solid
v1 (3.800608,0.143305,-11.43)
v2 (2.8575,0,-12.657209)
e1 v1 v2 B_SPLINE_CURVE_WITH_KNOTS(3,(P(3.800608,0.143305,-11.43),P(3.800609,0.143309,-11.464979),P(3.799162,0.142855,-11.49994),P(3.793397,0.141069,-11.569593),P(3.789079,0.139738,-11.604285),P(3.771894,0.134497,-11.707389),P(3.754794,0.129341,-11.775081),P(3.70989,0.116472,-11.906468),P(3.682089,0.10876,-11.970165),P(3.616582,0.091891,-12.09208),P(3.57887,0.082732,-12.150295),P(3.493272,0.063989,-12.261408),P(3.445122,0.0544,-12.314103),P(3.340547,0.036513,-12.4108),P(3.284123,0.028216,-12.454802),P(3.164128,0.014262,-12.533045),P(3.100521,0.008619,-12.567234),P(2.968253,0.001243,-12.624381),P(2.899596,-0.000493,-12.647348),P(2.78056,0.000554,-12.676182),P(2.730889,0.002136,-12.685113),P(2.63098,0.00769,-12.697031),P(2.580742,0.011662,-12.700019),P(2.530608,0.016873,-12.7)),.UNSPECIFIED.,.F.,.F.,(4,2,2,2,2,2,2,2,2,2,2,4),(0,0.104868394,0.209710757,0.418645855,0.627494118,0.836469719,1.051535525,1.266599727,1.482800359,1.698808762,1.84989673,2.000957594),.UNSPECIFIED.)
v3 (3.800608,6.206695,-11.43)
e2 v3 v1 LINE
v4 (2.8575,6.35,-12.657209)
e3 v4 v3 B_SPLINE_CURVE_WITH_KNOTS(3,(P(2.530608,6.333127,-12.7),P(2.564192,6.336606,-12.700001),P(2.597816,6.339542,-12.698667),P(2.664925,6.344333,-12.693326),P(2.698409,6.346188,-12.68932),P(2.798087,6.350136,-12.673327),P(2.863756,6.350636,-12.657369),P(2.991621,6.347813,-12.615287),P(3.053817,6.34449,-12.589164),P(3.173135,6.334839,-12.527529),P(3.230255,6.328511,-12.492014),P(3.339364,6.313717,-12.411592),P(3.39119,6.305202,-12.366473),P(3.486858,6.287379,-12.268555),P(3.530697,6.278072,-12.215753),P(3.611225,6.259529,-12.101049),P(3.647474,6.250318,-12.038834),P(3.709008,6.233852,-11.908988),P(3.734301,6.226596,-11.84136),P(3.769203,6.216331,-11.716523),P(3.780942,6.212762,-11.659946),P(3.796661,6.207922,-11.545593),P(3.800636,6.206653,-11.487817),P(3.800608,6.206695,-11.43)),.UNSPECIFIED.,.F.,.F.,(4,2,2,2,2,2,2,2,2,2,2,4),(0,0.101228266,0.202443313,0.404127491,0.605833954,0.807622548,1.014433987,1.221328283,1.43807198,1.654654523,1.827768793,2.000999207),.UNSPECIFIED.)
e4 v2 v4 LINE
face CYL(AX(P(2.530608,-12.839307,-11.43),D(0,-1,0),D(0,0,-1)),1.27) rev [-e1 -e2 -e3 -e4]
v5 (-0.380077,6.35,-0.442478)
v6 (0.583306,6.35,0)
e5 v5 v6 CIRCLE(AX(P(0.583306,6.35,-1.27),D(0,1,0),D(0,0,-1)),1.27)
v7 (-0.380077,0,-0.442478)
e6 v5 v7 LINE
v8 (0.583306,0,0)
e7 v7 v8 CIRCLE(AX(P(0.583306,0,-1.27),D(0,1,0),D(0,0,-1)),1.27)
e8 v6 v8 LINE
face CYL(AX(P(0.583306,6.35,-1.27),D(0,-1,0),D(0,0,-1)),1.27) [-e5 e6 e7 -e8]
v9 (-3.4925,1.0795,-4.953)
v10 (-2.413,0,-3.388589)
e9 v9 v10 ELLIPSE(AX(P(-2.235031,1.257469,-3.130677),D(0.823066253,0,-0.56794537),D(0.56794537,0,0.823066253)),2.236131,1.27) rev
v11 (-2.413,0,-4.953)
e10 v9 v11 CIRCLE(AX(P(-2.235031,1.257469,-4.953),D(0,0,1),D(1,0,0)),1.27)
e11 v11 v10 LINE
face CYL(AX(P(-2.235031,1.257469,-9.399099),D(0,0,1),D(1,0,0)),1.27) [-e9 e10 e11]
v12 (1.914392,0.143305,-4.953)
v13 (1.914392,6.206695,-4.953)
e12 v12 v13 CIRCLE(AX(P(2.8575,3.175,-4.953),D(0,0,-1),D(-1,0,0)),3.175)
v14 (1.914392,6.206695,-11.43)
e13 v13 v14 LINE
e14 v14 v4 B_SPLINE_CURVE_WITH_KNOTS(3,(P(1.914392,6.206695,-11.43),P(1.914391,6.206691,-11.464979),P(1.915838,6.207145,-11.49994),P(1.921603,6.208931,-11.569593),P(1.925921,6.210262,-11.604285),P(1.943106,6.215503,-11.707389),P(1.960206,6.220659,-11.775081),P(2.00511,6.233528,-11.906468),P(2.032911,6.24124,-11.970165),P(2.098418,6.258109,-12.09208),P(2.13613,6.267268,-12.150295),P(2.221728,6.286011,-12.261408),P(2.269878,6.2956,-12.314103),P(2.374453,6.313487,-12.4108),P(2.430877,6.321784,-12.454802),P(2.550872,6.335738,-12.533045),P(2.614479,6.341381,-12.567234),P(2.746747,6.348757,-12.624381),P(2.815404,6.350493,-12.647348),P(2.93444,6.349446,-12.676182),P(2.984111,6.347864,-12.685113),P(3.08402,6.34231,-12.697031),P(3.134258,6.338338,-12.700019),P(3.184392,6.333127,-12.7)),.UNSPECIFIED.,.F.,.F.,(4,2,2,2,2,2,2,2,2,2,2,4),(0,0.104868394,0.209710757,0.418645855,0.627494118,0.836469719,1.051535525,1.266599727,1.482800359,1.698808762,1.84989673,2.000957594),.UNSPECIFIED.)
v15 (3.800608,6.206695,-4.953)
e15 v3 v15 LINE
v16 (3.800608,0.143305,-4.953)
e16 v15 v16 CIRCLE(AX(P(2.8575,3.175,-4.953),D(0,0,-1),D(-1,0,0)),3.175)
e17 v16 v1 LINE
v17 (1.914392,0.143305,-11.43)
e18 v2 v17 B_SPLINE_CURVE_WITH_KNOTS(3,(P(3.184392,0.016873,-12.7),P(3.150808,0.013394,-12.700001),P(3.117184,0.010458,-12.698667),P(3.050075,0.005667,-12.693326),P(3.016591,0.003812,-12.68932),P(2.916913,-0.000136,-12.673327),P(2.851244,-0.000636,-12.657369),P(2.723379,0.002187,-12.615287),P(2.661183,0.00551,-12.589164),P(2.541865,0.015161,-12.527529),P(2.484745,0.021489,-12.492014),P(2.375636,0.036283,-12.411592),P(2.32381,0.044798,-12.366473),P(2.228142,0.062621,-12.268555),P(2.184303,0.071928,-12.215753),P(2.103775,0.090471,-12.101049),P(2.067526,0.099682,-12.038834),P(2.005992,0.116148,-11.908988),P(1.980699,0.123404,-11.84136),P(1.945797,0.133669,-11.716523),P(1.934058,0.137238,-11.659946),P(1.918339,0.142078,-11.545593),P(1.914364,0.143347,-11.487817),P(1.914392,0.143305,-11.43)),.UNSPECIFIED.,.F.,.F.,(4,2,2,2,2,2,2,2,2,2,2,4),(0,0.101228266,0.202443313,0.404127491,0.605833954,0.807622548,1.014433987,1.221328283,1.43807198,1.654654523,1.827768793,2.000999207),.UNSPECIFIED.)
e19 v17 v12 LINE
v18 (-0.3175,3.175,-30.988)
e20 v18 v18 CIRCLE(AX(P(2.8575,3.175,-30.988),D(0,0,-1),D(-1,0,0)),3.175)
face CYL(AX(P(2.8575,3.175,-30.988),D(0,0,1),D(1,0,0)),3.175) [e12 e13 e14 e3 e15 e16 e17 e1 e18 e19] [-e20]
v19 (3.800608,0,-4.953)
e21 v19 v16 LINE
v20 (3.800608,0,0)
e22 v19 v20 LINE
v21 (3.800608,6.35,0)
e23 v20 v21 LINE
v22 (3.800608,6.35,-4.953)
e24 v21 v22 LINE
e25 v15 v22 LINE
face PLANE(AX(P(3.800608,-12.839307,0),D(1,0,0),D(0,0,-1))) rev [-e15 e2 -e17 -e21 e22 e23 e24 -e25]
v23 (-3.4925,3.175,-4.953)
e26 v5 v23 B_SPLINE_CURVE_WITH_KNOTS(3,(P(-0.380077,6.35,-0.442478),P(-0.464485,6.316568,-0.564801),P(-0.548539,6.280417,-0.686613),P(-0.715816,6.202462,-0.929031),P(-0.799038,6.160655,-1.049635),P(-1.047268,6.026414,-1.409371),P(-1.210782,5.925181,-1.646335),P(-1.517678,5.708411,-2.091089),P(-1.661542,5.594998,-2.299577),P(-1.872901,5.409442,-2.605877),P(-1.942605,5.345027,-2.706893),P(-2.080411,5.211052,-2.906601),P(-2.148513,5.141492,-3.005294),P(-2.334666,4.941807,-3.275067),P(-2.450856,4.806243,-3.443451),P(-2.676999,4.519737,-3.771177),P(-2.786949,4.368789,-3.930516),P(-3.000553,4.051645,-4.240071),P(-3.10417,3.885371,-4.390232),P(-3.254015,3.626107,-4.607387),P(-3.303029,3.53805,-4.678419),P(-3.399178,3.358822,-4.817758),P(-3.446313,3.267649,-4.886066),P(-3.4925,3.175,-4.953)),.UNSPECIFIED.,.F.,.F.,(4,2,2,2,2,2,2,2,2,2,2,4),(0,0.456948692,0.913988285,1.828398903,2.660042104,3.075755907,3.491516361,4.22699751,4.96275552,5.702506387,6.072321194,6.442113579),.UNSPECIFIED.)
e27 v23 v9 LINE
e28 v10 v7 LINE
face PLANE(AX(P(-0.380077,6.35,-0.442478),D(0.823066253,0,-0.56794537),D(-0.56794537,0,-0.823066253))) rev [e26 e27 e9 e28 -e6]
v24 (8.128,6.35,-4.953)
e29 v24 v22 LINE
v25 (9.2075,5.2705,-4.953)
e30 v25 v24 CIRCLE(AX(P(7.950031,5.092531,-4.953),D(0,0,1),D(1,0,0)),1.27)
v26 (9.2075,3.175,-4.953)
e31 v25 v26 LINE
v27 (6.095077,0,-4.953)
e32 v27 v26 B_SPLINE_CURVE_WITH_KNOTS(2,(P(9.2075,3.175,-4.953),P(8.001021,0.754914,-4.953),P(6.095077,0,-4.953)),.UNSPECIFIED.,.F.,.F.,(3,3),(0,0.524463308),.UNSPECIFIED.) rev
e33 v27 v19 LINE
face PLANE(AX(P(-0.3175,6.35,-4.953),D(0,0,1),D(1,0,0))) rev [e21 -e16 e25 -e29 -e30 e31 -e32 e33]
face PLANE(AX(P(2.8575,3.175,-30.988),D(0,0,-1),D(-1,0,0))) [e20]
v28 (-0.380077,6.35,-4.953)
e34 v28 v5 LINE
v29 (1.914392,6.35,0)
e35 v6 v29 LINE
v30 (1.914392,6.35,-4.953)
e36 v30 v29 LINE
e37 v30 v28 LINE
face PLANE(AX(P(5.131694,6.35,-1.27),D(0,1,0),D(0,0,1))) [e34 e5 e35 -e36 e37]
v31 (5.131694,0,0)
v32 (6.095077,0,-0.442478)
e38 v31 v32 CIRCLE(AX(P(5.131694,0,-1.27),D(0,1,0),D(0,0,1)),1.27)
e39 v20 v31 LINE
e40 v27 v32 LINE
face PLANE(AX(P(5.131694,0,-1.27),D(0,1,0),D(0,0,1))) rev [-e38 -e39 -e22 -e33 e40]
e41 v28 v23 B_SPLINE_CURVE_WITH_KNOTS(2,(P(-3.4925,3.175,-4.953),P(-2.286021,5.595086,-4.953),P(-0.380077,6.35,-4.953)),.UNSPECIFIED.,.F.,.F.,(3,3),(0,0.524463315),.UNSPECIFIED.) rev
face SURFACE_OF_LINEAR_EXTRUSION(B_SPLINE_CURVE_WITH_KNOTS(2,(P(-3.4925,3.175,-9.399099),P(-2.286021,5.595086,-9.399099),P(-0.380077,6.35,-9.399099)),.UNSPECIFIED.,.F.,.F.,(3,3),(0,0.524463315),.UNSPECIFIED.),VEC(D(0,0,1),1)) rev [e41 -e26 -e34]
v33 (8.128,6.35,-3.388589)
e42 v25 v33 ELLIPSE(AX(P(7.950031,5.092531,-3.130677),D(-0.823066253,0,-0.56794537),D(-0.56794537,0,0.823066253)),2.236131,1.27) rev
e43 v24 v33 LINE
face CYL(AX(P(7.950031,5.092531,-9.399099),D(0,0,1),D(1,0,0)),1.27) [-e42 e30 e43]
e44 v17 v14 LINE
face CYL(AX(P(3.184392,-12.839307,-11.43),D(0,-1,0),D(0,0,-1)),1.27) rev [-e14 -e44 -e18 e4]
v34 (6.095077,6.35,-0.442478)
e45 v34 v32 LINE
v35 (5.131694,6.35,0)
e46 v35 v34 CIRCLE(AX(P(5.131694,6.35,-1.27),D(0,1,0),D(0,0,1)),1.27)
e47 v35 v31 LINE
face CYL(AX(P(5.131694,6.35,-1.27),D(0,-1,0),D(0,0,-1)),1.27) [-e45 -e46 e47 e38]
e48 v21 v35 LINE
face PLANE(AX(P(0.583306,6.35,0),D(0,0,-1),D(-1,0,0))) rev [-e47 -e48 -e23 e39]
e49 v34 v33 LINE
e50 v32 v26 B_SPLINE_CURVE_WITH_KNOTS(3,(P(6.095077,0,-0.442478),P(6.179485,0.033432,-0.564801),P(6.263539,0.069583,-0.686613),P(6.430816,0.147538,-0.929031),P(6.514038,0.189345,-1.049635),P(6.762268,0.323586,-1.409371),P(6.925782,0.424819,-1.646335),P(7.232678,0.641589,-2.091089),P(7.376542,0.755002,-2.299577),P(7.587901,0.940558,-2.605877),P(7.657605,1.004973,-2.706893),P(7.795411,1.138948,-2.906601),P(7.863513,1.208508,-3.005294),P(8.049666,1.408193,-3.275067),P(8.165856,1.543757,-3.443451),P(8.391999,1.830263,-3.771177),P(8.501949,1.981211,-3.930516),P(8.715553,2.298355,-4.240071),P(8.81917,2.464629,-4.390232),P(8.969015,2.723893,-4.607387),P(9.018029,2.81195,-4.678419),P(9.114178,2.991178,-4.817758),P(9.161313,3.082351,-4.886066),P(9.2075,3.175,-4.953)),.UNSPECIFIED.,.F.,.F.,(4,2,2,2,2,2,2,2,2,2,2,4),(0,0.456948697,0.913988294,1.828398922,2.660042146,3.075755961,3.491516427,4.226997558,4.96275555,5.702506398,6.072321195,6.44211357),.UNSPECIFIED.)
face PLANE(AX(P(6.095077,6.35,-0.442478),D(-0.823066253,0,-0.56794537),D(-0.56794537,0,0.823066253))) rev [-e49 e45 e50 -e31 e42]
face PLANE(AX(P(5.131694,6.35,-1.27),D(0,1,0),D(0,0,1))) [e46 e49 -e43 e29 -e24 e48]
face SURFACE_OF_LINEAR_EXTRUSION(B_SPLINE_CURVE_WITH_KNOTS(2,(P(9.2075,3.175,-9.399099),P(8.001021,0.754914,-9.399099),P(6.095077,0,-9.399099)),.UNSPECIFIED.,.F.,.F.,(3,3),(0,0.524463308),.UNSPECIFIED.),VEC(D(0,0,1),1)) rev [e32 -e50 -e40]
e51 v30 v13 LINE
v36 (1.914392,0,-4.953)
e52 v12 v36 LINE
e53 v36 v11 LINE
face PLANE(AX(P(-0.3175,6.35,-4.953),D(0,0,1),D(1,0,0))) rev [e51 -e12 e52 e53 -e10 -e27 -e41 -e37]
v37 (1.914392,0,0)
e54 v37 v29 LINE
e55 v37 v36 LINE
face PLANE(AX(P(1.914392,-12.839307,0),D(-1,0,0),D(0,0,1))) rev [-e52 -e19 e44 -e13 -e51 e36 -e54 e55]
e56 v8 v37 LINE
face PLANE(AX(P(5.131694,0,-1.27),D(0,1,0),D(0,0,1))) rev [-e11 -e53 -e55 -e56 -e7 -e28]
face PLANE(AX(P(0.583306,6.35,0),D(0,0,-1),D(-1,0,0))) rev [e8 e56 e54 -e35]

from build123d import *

# Parameters (mm, degrees)
BOSS_EXTRUDE1_DEPTH = 6.35
CUT_EXTRUDE3_DEPTH  = 4.953
SKETCH7_W           = 6.35
SKETCH7_H           = 6.35
CUT_EXTRUDE5_DEPTH  = 2.159
SKETCH9_R           = 3.175
BOSS_EXTRUDE4_DEPTH = 26.035
CUT_EXTRUDE6_REACH  = 34.945
SKETCH10_W          = 1.886216022
SKETCH10_H          = 12.7
FILLET1_R           = 1.27


with BuildPart() as part:
    # Sketch1 → Boss-Extrude1 (new body)
    with BuildSketch(Plane(origin=(0, 0, 0), x_dir=(1, 0, 0), z_dir=(0, 1, 0))):
        with BuildLine():
            Line((0.583306021, 0), (5.131693979, 0))
            ThreePointArc((5.131693979, 0), (5.661763503, 0.115908886), (6.095077487, 0.442478269))
            Line((6.095077487, 0.442478269), (9.2075, 4.953))
            Line((9.2075, 4.953), (6.0325, 4.953))
            Line((6.0325, 4.953), (6.0325, 7.112))
            Line((6.0325, 7.112), (-0.3175, 7.112))
            Line((-0.3175, 7.112), (-0.3175, 4.953))
            Line((-0.3175, 4.953), (-3.4925, 4.953))
            Line((-3.4925, 4.953), (-0.380077487, 0.442478269))
            ThreePointArc((-0.380077487, 0.442478269), (0.053236497, 0.115908886), (0.583306021, 0))
        make_face()
    extrude(amount=BOSS_EXTRUDE1_DEPTH)

    # Sketch5 → Cut-Extrude3 (cut)
    with BuildSketch(Plane.XY):
        with BuildLine():
            Line((-3.4925, 3.175), (-3.4925, 6.35))
            Line((-3.4925, 6.35), (-0.380077487, 6.35))
            add(Edge.make_bspline(
                [(-3.4925, 3.175), (-2.286021044, 5.595085513), (-0.380077487, 6.35)],
                knots=[0, 0, 0, 0.524463315, 0.524463315, 0.524463315], degree=2))
        make_face()
        with BuildLine():
            Line((6.095077487, 0), (9.2075, 0))
            Line((9.2075, 0), (9.2075, 3.175))
            add(Edge.make_bspline(
                [(9.2075, 3.175), (8.001021011, 0.754914499), (6.095077487, 0)],
                knots=[0, 0, 0, 0.524463308, 0.524463308, 0.524463308], degree=2))
        make_face()
        with BuildLine():
            Line((9.2075, 6.35), (9.2075, 5.2705))
            ThreePointArc((9.2075, 5.2705), (8.848057048, 5.990557048), (8.128, 6.35))
            Line((8.128, 6.35), (9.2075, 6.35))
        make_face()
        with BuildLine():
            Line((-3.4925, 0), (-2.413, 0))
            ThreePointArc((-2.413, 0), (-3.133057048, 0.359442952), (-3.4925, 1.0795))
            Line((-3.4925, 1.0795), (-3.4925, 0))
        make_face()
    extrude(amount=-CUT_EXTRUDE3_DEPTH, mode=Mode.SUBTRACT)

    # Sketch7 → Cut-Extrude5 (cut)
    with BuildSketch(Plane(origin=(0, 0, -7.112), x_dir=(-1, 0, 0), z_dir=(0, 0, -1))):
        with Locations((-2.8575, 3.175)):
            Rectangle(SKETCH7_W, SKETCH7_H)
    extrude(amount=-CUT_EXTRUDE5_DEPTH, mode=Mode.SUBTRACT)

    # Sketch9 → Boss-Extrude4 (add)
    with BuildSketch(Plane(origin=(0, 0, -4.953), x_dir=(-1, 0, 0), z_dir=(0, 0, -1))):
        with Locations(Location((-2.8575, 3.175, 0), (0, 0, 270))):
            Circle(SKETCH9_R)
    extrude(amount=BOSS_EXTRUDE4_DEPTH)

    # Cut-Extrude6: up to this face of the body (flat: up to its plane)
    cut_extrude6_end = Plane(part.part.faces().sort_by_distance((2.192673253, 0, -2.628972318))[0])
    # Sketch10 → Cut-Extrude6 (cut, up to the picked face)
    with BuildSketch(Plane(origin=(0, 6.35, 0), x_dir=(1, 0, 0), z_dir=(0, 1, 0)), mode=Mode.PRIVATE) as cut_extrude6_sk1:
        with Locations((2.8575, 6.35)):
            Rectangle(SKETCH10_W, SKETCH10_H)
    cut_extrude6_tool1 = split(extrude(cut_extrude6_sk1.sketch, amount=-CUT_EXTRUDE6_REACH, mode=Mode.PRIVATE), bisect_by=cut_extrude6_end, keep=Keep.BOTH, mode=Mode.PRIVATE)
    add(cut_extrude6_tool1.solids().sort_by(Axis((2.8575, 6.35, -6.35), (0, -1, 0)))[0], mode=Mode.SUBTRACT)

    # Fillet1
    # the kernel refuses this fillet: 1.27 mm, written as the material it adds along each edge
    with BuildSketch(Plane(origin=(1.914391989, 9.381694622, -12.7), x_dir=(1, 0, 0), z_dir=(0, -1, 0))) as fillet1_piece_1_section:
        with BuildLine():
            CenterArc((FILLET1_R, FILLET1_R), FILLET1_R, 180, 90)
            Line((0, FILLET1_R), (0, 0))
            Line((0, 0), (FILLET1_R, 0))
        make_face()
    fillet1_piece_1 = extrude(amount=12.413389243, mode=Mode.PRIVATE)
    fillet1_piece_1 = fillet1_piece_1 & Plane(origin=(2.8575, 3.175, -12.415110082), x_dir=(0, -1, 0), z_dir=(0, 0, 1)) * Cylinder(3.175, 30, mode=Mode.PRIVATE)
    add(fillet1_piece_1)
    with BuildSketch(Plane(origin=(3.800608011, 9.381694622, -12.7), x_dir=(0, 0, 1), z_dir=(0, -1, 0))) as fillet1_piece_2_section:
        with BuildLine():
            CenterArc((FILLET1_R, FILLET1_R), FILLET1_R, 180, 90)
            Line((0, FILLET1_R), (0, 0))
            Line((0, 0), (FILLET1_R, 0))
        make_face()
    fillet1_piece_2 = extrude(amount=12.413389243, mode=Mode.PRIVATE)
    fillet1_piece_2 = fillet1_piece_2 & Plane(origin=(2.8575, 3.175, -12.415110016), x_dir=(0, -1, 0), z_dir=(0, 0, 1)) * Cylinder(3.175, 30, mode=Mode.PRIVATE)
    add(fillet1_piece_2)


solid = part.part
